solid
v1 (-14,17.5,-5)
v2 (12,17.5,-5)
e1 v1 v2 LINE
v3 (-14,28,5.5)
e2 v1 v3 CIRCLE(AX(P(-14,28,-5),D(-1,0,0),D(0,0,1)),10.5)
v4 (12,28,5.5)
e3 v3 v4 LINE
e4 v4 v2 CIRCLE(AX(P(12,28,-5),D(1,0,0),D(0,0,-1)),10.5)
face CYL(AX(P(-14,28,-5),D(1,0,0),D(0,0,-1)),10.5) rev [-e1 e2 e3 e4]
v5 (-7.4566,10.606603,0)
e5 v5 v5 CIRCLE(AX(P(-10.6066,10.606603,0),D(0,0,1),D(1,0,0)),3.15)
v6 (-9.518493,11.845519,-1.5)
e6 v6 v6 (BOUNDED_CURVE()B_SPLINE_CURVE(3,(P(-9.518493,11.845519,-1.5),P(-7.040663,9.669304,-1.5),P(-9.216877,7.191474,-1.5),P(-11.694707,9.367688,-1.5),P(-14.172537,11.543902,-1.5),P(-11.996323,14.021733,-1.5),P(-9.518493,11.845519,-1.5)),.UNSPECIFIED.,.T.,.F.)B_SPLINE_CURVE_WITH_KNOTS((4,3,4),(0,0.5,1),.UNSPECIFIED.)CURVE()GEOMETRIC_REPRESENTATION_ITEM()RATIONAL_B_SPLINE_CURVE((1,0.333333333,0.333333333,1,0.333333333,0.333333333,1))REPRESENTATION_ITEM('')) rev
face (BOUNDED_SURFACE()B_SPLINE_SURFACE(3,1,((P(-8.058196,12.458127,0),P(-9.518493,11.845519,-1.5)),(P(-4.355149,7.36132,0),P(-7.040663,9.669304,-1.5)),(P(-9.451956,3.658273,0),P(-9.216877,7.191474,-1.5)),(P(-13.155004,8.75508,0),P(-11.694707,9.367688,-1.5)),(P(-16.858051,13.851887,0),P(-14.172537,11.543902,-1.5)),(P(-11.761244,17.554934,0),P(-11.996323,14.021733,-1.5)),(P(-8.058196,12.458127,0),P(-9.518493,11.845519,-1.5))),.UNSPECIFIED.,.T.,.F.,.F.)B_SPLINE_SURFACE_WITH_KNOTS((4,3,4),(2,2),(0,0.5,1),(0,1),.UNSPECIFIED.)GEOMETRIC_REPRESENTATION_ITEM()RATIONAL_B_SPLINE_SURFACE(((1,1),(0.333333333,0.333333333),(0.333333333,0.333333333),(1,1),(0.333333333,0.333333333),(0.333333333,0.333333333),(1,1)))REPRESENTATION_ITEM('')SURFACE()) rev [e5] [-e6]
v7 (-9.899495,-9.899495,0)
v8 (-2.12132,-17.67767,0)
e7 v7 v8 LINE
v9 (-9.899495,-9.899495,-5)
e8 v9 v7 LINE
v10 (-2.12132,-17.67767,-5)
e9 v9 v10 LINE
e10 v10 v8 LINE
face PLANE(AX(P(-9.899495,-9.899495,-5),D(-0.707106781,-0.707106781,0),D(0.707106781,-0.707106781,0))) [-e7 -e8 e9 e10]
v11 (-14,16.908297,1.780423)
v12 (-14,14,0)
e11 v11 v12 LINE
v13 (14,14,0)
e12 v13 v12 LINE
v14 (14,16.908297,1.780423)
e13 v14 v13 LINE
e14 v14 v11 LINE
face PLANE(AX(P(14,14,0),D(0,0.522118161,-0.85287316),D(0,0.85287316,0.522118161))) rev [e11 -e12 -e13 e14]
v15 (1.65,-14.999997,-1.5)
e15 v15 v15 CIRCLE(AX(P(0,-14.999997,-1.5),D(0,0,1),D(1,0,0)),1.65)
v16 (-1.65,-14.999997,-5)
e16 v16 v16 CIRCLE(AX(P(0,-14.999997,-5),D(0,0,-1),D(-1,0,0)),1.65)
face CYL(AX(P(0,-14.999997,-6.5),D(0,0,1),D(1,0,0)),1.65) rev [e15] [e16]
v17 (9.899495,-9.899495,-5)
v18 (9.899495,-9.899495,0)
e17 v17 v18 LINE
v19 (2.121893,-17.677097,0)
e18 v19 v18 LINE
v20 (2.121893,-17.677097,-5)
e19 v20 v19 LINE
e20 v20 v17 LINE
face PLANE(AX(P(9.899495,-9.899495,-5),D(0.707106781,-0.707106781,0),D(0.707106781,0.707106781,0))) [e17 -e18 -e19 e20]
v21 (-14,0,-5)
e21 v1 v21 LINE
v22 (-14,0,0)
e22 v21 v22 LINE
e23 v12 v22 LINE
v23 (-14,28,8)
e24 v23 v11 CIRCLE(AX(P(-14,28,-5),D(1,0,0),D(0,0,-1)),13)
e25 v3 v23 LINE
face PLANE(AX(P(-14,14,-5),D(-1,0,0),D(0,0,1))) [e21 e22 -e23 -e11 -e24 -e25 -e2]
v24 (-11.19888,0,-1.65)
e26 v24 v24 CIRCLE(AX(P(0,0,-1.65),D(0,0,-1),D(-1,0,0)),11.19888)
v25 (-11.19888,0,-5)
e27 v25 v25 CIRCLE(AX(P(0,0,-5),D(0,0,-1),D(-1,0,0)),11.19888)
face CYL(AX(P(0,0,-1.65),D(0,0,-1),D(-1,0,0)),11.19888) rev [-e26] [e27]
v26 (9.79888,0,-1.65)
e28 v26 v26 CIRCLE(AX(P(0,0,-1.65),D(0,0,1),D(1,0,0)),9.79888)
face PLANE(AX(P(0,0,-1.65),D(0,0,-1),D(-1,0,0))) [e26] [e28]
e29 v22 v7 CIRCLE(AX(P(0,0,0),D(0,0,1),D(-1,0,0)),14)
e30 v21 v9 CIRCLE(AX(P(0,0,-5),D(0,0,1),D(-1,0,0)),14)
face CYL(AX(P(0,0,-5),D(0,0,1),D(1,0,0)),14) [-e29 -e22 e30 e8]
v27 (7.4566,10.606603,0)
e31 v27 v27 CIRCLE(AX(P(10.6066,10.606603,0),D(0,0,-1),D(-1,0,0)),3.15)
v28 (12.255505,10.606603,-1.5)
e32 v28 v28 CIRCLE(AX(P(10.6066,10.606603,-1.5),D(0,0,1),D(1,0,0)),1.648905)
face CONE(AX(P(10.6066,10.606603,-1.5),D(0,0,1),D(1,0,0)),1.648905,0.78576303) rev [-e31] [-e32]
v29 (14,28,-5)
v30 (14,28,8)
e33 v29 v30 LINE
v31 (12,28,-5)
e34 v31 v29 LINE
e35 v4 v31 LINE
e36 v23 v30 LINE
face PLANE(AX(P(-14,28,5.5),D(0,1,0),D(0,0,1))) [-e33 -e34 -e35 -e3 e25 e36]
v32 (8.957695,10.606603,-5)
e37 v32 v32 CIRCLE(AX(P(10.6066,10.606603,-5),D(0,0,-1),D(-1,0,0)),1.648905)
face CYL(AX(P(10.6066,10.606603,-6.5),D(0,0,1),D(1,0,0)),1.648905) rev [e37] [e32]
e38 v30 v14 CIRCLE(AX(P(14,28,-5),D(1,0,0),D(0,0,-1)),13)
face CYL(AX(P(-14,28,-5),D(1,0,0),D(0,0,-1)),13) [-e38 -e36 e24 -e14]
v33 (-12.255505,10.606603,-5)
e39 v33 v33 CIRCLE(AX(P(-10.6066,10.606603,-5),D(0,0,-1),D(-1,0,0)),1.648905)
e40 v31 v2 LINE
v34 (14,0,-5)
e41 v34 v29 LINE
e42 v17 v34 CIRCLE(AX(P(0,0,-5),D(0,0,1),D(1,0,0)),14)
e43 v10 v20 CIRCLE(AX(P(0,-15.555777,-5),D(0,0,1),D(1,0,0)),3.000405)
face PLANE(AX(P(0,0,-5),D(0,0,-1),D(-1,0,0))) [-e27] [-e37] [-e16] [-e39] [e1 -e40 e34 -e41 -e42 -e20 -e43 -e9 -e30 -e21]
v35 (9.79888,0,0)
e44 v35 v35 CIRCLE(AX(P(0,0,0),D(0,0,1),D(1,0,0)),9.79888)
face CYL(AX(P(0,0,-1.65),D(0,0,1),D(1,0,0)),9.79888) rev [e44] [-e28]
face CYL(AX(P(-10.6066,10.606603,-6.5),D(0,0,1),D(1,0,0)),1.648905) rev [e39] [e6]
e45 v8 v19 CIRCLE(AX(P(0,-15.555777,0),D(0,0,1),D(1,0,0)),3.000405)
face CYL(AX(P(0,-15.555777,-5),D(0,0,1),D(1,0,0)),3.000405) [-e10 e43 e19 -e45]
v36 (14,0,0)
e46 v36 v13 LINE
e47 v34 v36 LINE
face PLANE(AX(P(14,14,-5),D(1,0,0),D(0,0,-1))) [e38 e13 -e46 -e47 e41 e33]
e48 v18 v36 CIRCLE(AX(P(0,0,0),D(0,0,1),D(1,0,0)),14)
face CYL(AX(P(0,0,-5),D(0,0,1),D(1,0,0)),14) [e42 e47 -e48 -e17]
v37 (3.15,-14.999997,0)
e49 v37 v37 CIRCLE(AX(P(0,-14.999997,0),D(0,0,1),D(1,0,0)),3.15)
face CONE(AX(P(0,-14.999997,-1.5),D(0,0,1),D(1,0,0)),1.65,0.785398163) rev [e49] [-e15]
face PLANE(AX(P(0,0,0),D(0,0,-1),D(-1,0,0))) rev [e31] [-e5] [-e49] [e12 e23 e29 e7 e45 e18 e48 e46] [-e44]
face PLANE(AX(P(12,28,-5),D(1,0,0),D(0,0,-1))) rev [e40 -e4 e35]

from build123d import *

# Parameters (mm, degrees)
EXTRUDE_3_DEPTH     = 5
SKETCH_1_R          = 9.79888
CUT_EXTRUDE_1_DEPTH = 1.65
SKETCH_1_9_R        = 3.15
SKETCH_3_8_R        = 1.65
SKETCH_3_9_R        = 1.648905
SKETCH_3_9_R_2      = 1.65
CUT_EXTRUDE_2_DEPTH = 5
SKETCH_10_R         = 11.19888
CUT_EXTRUDE_3_DEPTH = 3.35
EXTRUDE_4_DEPTH     = 28
EXTRUDE_5_DEPTH     = 2
EXTRUDE_6_DEPTH     = 28


with BuildPart() as part:
    # 草图7 → 凸台-拉伸3 (new body)
    with BuildSketch(Plane.XY):
        with BuildLine():
            Line((14, 14), (-14, 14))
            Line((-14, 14), (-14, 0))
            ThreePointArc((-14, 0), (-12.934313455, -5.357568053), (-9.899494937, -9.899494937))
            Line((-9.899494937, -9.899494937), (-2.121320344, -17.67766953))
            ThreePointArc((-2.121320344, -17.67766953), (0.000404905, -18.556181469), (2.121892965, -17.677096908))
            Line((2.121892965, -17.677096908), (9.899494937, -9.899494937))
            ThreePointArc((9.899494937, -9.899494937), (12.934313455, -5.357568053), (14, 0))
            Line((14, 0), (14, 14))
        make_face()
    extrude(amount=-EXTRUDE_3_DEPTH)

    # 草图1 → 切除-拉伸1 (cut)
    with BuildSketch(Plane.XY):
        Circle(SKETCH_1_R)
    extrude(amount=-CUT_EXTRUDE_1_DEPTH, mode=Mode.SUBTRACT)

    # 切除-放样1: read off the stored shape, not the designer's step
    # 切除-放样1 outline → 切除-放样1 (revolve, cut)
    with BuildSketch(Plane(origin=(10.6066, 10.606603436, 0), x_dir=(1, 0, 0), z_dir=(0, -1, 0))):
        Polygon((0, 0), (0, -1.5), (1.648905, -1.5), (3.15, 0), align=None)
    revolve(axis=Axis((10.6066, 10.606603436, 0), (0, 0, 1)), mode=Mode.SUBTRACT)

    # 切除-放样2: read off the stored shape, not the designer's step
    # 切除-放样2: loft between two sections, ruled curve by curve
    loft_2_from = [
        Edge.make_bspline([(-8.058196468, 12.45812698, 0), (-4.355149378, 7.361319916, 0), (-9.451956443, 3.658272826, 0), (-13.155003532, 8.755079891, 0), (-16.858050622, 13.851886955, 0), (-11.761243557, 17.554934045, 0), (-8.058196468, 12.45812698, 0)], [0, 0, 0, 0, 0.5, 0.5, 0.5, 1, 1, 1, 1], 3, [1, 0.333333333, 0.333333333, 1, 0.333333333, 0.333333333, 1]),
    ]
    loft_2_to = [
        Edge.make_bspline([(-9.518492924, 11.845518562, -1.5), (-7.040662671, 9.669304411, -1.5), (-9.216876823, 7.191474158, -1.5), (-11.694707076, 9.367688309, -1.5), (-14.172537329, 11.543902461, -1.5), (-11.996323177, 14.021732714, -1.5), (-9.518492924, 11.845518562, -1.5)], [0, 0, 0, 0, 0.5, 0.5, 0.5, 1, 1, 1, 1], 3, [1, 0.333333333, 0.333333333, 1, 0.333333333, 0.333333333, 1]),
    ]
    loft_2 = Solid(Shell([*[Face.make_surface_from_curves(loft_2_from[k], loft_2_to[k]) for k in range(1)], Face(Wire(loft_2_from)), Face(Wire(loft_2_to))]))
    add(loft_2, mode=Mode.SUBTRACT)

    # 草图1<9> → 切除-放样3 section 0
    with BuildSketch(Plane.XY):
        with Locations((0, -14.999996564)):
            Circle(SKETCH_1_9_R)
    # 草图3<8> → 切除-放样3 section 1
    with BuildSketch(Plane.XY.offset(-1.5)):
        with Locations((0, -14.999996564)):
            Circle(SKETCH_3_8_R)
    loft(mode=Mode.SUBTRACT)

    # 草图3<9> → 切除-拉伸2 (cut)
    with BuildSketch(Plane.XY.offset(-1.5)):
        with Locations(Location((-10.6066, 10.606603436, 0), (0, 0, 48.708))):
            Circle(SKETCH_3_9_R)
        with Locations((10.6066, 10.606603436)):
            Circle(SKETCH_3_9_R)
        with Locations((0, -14.999996564)):
            Circle(SKETCH_3_9_R_2)
    extrude(amount=-CUT_EXTRUDE_2_DEPTH, mode=Mode.SUBTRACT)

    # 草图10 → 切除-拉伸3 (cut)
    with BuildSketch(Plane(origin=(0, 0, -5), x_dir=(-1, 0, 0), z_dir=(0, 0, -1))):
        Circle(SKETCH_10_R)
    extrude(amount=-CUT_EXTRUDE_3_DEPTH, mode=Mode.SUBTRACT)



with BuildPart() as body_2:
    # 草图11 → 凸台-拉伸4 (new body)
    with BuildSketch(Plane(origin=(14, 0, 0), x_dir=(0, 0, -1), z_dir=(1, 0, 0))):
        with BuildLine():
            Line((5, 15), (5, 17.5))
            ThreePointArc((5, 17.5), (-2.424621202, 20.575378798), (-5.5, 28))
            Line((-5.5, 28), (-8, 28))
            ThreePointArc((-8, 28), (-4.192388155, 18.807611845), (5, 15))
        make_face()
    extrude(amount=-EXTRUDE_4_DEPTH)

    # 草图13 → 凸台-拉伸5 (add)
    with BuildSketch(Plane.ZY.offset(-14)):
        with BuildLine():
            Line((-5, 28), (-5, 15))
            ThreePointArc((-5, 15), (4.192388155, 18.807611845), (8, 28))
            Line((8, 28), (-5, 28))
        make_face()
    extrude(amount=EXTRUDE_5_DEPTH)


with BuildPart() as part_1:
    add(part.part)

    add(body_2.part)  # 凸台-拉伸6 merges body 2
    # 草图14 → 凸台-拉伸6 (add)
    with BuildSketch(Plane(origin=(-14, 0, 0), x_dir=(0, 0, -1), z_dir=(1, 0, 0))):
        Polygon((0, 14), (-1.780422928, 16.908297474), (5, 16.908297474), (5, 14), align=None)
    extrude(amount=EXTRUDE_6_DEPTH)


solid = part_1.part
